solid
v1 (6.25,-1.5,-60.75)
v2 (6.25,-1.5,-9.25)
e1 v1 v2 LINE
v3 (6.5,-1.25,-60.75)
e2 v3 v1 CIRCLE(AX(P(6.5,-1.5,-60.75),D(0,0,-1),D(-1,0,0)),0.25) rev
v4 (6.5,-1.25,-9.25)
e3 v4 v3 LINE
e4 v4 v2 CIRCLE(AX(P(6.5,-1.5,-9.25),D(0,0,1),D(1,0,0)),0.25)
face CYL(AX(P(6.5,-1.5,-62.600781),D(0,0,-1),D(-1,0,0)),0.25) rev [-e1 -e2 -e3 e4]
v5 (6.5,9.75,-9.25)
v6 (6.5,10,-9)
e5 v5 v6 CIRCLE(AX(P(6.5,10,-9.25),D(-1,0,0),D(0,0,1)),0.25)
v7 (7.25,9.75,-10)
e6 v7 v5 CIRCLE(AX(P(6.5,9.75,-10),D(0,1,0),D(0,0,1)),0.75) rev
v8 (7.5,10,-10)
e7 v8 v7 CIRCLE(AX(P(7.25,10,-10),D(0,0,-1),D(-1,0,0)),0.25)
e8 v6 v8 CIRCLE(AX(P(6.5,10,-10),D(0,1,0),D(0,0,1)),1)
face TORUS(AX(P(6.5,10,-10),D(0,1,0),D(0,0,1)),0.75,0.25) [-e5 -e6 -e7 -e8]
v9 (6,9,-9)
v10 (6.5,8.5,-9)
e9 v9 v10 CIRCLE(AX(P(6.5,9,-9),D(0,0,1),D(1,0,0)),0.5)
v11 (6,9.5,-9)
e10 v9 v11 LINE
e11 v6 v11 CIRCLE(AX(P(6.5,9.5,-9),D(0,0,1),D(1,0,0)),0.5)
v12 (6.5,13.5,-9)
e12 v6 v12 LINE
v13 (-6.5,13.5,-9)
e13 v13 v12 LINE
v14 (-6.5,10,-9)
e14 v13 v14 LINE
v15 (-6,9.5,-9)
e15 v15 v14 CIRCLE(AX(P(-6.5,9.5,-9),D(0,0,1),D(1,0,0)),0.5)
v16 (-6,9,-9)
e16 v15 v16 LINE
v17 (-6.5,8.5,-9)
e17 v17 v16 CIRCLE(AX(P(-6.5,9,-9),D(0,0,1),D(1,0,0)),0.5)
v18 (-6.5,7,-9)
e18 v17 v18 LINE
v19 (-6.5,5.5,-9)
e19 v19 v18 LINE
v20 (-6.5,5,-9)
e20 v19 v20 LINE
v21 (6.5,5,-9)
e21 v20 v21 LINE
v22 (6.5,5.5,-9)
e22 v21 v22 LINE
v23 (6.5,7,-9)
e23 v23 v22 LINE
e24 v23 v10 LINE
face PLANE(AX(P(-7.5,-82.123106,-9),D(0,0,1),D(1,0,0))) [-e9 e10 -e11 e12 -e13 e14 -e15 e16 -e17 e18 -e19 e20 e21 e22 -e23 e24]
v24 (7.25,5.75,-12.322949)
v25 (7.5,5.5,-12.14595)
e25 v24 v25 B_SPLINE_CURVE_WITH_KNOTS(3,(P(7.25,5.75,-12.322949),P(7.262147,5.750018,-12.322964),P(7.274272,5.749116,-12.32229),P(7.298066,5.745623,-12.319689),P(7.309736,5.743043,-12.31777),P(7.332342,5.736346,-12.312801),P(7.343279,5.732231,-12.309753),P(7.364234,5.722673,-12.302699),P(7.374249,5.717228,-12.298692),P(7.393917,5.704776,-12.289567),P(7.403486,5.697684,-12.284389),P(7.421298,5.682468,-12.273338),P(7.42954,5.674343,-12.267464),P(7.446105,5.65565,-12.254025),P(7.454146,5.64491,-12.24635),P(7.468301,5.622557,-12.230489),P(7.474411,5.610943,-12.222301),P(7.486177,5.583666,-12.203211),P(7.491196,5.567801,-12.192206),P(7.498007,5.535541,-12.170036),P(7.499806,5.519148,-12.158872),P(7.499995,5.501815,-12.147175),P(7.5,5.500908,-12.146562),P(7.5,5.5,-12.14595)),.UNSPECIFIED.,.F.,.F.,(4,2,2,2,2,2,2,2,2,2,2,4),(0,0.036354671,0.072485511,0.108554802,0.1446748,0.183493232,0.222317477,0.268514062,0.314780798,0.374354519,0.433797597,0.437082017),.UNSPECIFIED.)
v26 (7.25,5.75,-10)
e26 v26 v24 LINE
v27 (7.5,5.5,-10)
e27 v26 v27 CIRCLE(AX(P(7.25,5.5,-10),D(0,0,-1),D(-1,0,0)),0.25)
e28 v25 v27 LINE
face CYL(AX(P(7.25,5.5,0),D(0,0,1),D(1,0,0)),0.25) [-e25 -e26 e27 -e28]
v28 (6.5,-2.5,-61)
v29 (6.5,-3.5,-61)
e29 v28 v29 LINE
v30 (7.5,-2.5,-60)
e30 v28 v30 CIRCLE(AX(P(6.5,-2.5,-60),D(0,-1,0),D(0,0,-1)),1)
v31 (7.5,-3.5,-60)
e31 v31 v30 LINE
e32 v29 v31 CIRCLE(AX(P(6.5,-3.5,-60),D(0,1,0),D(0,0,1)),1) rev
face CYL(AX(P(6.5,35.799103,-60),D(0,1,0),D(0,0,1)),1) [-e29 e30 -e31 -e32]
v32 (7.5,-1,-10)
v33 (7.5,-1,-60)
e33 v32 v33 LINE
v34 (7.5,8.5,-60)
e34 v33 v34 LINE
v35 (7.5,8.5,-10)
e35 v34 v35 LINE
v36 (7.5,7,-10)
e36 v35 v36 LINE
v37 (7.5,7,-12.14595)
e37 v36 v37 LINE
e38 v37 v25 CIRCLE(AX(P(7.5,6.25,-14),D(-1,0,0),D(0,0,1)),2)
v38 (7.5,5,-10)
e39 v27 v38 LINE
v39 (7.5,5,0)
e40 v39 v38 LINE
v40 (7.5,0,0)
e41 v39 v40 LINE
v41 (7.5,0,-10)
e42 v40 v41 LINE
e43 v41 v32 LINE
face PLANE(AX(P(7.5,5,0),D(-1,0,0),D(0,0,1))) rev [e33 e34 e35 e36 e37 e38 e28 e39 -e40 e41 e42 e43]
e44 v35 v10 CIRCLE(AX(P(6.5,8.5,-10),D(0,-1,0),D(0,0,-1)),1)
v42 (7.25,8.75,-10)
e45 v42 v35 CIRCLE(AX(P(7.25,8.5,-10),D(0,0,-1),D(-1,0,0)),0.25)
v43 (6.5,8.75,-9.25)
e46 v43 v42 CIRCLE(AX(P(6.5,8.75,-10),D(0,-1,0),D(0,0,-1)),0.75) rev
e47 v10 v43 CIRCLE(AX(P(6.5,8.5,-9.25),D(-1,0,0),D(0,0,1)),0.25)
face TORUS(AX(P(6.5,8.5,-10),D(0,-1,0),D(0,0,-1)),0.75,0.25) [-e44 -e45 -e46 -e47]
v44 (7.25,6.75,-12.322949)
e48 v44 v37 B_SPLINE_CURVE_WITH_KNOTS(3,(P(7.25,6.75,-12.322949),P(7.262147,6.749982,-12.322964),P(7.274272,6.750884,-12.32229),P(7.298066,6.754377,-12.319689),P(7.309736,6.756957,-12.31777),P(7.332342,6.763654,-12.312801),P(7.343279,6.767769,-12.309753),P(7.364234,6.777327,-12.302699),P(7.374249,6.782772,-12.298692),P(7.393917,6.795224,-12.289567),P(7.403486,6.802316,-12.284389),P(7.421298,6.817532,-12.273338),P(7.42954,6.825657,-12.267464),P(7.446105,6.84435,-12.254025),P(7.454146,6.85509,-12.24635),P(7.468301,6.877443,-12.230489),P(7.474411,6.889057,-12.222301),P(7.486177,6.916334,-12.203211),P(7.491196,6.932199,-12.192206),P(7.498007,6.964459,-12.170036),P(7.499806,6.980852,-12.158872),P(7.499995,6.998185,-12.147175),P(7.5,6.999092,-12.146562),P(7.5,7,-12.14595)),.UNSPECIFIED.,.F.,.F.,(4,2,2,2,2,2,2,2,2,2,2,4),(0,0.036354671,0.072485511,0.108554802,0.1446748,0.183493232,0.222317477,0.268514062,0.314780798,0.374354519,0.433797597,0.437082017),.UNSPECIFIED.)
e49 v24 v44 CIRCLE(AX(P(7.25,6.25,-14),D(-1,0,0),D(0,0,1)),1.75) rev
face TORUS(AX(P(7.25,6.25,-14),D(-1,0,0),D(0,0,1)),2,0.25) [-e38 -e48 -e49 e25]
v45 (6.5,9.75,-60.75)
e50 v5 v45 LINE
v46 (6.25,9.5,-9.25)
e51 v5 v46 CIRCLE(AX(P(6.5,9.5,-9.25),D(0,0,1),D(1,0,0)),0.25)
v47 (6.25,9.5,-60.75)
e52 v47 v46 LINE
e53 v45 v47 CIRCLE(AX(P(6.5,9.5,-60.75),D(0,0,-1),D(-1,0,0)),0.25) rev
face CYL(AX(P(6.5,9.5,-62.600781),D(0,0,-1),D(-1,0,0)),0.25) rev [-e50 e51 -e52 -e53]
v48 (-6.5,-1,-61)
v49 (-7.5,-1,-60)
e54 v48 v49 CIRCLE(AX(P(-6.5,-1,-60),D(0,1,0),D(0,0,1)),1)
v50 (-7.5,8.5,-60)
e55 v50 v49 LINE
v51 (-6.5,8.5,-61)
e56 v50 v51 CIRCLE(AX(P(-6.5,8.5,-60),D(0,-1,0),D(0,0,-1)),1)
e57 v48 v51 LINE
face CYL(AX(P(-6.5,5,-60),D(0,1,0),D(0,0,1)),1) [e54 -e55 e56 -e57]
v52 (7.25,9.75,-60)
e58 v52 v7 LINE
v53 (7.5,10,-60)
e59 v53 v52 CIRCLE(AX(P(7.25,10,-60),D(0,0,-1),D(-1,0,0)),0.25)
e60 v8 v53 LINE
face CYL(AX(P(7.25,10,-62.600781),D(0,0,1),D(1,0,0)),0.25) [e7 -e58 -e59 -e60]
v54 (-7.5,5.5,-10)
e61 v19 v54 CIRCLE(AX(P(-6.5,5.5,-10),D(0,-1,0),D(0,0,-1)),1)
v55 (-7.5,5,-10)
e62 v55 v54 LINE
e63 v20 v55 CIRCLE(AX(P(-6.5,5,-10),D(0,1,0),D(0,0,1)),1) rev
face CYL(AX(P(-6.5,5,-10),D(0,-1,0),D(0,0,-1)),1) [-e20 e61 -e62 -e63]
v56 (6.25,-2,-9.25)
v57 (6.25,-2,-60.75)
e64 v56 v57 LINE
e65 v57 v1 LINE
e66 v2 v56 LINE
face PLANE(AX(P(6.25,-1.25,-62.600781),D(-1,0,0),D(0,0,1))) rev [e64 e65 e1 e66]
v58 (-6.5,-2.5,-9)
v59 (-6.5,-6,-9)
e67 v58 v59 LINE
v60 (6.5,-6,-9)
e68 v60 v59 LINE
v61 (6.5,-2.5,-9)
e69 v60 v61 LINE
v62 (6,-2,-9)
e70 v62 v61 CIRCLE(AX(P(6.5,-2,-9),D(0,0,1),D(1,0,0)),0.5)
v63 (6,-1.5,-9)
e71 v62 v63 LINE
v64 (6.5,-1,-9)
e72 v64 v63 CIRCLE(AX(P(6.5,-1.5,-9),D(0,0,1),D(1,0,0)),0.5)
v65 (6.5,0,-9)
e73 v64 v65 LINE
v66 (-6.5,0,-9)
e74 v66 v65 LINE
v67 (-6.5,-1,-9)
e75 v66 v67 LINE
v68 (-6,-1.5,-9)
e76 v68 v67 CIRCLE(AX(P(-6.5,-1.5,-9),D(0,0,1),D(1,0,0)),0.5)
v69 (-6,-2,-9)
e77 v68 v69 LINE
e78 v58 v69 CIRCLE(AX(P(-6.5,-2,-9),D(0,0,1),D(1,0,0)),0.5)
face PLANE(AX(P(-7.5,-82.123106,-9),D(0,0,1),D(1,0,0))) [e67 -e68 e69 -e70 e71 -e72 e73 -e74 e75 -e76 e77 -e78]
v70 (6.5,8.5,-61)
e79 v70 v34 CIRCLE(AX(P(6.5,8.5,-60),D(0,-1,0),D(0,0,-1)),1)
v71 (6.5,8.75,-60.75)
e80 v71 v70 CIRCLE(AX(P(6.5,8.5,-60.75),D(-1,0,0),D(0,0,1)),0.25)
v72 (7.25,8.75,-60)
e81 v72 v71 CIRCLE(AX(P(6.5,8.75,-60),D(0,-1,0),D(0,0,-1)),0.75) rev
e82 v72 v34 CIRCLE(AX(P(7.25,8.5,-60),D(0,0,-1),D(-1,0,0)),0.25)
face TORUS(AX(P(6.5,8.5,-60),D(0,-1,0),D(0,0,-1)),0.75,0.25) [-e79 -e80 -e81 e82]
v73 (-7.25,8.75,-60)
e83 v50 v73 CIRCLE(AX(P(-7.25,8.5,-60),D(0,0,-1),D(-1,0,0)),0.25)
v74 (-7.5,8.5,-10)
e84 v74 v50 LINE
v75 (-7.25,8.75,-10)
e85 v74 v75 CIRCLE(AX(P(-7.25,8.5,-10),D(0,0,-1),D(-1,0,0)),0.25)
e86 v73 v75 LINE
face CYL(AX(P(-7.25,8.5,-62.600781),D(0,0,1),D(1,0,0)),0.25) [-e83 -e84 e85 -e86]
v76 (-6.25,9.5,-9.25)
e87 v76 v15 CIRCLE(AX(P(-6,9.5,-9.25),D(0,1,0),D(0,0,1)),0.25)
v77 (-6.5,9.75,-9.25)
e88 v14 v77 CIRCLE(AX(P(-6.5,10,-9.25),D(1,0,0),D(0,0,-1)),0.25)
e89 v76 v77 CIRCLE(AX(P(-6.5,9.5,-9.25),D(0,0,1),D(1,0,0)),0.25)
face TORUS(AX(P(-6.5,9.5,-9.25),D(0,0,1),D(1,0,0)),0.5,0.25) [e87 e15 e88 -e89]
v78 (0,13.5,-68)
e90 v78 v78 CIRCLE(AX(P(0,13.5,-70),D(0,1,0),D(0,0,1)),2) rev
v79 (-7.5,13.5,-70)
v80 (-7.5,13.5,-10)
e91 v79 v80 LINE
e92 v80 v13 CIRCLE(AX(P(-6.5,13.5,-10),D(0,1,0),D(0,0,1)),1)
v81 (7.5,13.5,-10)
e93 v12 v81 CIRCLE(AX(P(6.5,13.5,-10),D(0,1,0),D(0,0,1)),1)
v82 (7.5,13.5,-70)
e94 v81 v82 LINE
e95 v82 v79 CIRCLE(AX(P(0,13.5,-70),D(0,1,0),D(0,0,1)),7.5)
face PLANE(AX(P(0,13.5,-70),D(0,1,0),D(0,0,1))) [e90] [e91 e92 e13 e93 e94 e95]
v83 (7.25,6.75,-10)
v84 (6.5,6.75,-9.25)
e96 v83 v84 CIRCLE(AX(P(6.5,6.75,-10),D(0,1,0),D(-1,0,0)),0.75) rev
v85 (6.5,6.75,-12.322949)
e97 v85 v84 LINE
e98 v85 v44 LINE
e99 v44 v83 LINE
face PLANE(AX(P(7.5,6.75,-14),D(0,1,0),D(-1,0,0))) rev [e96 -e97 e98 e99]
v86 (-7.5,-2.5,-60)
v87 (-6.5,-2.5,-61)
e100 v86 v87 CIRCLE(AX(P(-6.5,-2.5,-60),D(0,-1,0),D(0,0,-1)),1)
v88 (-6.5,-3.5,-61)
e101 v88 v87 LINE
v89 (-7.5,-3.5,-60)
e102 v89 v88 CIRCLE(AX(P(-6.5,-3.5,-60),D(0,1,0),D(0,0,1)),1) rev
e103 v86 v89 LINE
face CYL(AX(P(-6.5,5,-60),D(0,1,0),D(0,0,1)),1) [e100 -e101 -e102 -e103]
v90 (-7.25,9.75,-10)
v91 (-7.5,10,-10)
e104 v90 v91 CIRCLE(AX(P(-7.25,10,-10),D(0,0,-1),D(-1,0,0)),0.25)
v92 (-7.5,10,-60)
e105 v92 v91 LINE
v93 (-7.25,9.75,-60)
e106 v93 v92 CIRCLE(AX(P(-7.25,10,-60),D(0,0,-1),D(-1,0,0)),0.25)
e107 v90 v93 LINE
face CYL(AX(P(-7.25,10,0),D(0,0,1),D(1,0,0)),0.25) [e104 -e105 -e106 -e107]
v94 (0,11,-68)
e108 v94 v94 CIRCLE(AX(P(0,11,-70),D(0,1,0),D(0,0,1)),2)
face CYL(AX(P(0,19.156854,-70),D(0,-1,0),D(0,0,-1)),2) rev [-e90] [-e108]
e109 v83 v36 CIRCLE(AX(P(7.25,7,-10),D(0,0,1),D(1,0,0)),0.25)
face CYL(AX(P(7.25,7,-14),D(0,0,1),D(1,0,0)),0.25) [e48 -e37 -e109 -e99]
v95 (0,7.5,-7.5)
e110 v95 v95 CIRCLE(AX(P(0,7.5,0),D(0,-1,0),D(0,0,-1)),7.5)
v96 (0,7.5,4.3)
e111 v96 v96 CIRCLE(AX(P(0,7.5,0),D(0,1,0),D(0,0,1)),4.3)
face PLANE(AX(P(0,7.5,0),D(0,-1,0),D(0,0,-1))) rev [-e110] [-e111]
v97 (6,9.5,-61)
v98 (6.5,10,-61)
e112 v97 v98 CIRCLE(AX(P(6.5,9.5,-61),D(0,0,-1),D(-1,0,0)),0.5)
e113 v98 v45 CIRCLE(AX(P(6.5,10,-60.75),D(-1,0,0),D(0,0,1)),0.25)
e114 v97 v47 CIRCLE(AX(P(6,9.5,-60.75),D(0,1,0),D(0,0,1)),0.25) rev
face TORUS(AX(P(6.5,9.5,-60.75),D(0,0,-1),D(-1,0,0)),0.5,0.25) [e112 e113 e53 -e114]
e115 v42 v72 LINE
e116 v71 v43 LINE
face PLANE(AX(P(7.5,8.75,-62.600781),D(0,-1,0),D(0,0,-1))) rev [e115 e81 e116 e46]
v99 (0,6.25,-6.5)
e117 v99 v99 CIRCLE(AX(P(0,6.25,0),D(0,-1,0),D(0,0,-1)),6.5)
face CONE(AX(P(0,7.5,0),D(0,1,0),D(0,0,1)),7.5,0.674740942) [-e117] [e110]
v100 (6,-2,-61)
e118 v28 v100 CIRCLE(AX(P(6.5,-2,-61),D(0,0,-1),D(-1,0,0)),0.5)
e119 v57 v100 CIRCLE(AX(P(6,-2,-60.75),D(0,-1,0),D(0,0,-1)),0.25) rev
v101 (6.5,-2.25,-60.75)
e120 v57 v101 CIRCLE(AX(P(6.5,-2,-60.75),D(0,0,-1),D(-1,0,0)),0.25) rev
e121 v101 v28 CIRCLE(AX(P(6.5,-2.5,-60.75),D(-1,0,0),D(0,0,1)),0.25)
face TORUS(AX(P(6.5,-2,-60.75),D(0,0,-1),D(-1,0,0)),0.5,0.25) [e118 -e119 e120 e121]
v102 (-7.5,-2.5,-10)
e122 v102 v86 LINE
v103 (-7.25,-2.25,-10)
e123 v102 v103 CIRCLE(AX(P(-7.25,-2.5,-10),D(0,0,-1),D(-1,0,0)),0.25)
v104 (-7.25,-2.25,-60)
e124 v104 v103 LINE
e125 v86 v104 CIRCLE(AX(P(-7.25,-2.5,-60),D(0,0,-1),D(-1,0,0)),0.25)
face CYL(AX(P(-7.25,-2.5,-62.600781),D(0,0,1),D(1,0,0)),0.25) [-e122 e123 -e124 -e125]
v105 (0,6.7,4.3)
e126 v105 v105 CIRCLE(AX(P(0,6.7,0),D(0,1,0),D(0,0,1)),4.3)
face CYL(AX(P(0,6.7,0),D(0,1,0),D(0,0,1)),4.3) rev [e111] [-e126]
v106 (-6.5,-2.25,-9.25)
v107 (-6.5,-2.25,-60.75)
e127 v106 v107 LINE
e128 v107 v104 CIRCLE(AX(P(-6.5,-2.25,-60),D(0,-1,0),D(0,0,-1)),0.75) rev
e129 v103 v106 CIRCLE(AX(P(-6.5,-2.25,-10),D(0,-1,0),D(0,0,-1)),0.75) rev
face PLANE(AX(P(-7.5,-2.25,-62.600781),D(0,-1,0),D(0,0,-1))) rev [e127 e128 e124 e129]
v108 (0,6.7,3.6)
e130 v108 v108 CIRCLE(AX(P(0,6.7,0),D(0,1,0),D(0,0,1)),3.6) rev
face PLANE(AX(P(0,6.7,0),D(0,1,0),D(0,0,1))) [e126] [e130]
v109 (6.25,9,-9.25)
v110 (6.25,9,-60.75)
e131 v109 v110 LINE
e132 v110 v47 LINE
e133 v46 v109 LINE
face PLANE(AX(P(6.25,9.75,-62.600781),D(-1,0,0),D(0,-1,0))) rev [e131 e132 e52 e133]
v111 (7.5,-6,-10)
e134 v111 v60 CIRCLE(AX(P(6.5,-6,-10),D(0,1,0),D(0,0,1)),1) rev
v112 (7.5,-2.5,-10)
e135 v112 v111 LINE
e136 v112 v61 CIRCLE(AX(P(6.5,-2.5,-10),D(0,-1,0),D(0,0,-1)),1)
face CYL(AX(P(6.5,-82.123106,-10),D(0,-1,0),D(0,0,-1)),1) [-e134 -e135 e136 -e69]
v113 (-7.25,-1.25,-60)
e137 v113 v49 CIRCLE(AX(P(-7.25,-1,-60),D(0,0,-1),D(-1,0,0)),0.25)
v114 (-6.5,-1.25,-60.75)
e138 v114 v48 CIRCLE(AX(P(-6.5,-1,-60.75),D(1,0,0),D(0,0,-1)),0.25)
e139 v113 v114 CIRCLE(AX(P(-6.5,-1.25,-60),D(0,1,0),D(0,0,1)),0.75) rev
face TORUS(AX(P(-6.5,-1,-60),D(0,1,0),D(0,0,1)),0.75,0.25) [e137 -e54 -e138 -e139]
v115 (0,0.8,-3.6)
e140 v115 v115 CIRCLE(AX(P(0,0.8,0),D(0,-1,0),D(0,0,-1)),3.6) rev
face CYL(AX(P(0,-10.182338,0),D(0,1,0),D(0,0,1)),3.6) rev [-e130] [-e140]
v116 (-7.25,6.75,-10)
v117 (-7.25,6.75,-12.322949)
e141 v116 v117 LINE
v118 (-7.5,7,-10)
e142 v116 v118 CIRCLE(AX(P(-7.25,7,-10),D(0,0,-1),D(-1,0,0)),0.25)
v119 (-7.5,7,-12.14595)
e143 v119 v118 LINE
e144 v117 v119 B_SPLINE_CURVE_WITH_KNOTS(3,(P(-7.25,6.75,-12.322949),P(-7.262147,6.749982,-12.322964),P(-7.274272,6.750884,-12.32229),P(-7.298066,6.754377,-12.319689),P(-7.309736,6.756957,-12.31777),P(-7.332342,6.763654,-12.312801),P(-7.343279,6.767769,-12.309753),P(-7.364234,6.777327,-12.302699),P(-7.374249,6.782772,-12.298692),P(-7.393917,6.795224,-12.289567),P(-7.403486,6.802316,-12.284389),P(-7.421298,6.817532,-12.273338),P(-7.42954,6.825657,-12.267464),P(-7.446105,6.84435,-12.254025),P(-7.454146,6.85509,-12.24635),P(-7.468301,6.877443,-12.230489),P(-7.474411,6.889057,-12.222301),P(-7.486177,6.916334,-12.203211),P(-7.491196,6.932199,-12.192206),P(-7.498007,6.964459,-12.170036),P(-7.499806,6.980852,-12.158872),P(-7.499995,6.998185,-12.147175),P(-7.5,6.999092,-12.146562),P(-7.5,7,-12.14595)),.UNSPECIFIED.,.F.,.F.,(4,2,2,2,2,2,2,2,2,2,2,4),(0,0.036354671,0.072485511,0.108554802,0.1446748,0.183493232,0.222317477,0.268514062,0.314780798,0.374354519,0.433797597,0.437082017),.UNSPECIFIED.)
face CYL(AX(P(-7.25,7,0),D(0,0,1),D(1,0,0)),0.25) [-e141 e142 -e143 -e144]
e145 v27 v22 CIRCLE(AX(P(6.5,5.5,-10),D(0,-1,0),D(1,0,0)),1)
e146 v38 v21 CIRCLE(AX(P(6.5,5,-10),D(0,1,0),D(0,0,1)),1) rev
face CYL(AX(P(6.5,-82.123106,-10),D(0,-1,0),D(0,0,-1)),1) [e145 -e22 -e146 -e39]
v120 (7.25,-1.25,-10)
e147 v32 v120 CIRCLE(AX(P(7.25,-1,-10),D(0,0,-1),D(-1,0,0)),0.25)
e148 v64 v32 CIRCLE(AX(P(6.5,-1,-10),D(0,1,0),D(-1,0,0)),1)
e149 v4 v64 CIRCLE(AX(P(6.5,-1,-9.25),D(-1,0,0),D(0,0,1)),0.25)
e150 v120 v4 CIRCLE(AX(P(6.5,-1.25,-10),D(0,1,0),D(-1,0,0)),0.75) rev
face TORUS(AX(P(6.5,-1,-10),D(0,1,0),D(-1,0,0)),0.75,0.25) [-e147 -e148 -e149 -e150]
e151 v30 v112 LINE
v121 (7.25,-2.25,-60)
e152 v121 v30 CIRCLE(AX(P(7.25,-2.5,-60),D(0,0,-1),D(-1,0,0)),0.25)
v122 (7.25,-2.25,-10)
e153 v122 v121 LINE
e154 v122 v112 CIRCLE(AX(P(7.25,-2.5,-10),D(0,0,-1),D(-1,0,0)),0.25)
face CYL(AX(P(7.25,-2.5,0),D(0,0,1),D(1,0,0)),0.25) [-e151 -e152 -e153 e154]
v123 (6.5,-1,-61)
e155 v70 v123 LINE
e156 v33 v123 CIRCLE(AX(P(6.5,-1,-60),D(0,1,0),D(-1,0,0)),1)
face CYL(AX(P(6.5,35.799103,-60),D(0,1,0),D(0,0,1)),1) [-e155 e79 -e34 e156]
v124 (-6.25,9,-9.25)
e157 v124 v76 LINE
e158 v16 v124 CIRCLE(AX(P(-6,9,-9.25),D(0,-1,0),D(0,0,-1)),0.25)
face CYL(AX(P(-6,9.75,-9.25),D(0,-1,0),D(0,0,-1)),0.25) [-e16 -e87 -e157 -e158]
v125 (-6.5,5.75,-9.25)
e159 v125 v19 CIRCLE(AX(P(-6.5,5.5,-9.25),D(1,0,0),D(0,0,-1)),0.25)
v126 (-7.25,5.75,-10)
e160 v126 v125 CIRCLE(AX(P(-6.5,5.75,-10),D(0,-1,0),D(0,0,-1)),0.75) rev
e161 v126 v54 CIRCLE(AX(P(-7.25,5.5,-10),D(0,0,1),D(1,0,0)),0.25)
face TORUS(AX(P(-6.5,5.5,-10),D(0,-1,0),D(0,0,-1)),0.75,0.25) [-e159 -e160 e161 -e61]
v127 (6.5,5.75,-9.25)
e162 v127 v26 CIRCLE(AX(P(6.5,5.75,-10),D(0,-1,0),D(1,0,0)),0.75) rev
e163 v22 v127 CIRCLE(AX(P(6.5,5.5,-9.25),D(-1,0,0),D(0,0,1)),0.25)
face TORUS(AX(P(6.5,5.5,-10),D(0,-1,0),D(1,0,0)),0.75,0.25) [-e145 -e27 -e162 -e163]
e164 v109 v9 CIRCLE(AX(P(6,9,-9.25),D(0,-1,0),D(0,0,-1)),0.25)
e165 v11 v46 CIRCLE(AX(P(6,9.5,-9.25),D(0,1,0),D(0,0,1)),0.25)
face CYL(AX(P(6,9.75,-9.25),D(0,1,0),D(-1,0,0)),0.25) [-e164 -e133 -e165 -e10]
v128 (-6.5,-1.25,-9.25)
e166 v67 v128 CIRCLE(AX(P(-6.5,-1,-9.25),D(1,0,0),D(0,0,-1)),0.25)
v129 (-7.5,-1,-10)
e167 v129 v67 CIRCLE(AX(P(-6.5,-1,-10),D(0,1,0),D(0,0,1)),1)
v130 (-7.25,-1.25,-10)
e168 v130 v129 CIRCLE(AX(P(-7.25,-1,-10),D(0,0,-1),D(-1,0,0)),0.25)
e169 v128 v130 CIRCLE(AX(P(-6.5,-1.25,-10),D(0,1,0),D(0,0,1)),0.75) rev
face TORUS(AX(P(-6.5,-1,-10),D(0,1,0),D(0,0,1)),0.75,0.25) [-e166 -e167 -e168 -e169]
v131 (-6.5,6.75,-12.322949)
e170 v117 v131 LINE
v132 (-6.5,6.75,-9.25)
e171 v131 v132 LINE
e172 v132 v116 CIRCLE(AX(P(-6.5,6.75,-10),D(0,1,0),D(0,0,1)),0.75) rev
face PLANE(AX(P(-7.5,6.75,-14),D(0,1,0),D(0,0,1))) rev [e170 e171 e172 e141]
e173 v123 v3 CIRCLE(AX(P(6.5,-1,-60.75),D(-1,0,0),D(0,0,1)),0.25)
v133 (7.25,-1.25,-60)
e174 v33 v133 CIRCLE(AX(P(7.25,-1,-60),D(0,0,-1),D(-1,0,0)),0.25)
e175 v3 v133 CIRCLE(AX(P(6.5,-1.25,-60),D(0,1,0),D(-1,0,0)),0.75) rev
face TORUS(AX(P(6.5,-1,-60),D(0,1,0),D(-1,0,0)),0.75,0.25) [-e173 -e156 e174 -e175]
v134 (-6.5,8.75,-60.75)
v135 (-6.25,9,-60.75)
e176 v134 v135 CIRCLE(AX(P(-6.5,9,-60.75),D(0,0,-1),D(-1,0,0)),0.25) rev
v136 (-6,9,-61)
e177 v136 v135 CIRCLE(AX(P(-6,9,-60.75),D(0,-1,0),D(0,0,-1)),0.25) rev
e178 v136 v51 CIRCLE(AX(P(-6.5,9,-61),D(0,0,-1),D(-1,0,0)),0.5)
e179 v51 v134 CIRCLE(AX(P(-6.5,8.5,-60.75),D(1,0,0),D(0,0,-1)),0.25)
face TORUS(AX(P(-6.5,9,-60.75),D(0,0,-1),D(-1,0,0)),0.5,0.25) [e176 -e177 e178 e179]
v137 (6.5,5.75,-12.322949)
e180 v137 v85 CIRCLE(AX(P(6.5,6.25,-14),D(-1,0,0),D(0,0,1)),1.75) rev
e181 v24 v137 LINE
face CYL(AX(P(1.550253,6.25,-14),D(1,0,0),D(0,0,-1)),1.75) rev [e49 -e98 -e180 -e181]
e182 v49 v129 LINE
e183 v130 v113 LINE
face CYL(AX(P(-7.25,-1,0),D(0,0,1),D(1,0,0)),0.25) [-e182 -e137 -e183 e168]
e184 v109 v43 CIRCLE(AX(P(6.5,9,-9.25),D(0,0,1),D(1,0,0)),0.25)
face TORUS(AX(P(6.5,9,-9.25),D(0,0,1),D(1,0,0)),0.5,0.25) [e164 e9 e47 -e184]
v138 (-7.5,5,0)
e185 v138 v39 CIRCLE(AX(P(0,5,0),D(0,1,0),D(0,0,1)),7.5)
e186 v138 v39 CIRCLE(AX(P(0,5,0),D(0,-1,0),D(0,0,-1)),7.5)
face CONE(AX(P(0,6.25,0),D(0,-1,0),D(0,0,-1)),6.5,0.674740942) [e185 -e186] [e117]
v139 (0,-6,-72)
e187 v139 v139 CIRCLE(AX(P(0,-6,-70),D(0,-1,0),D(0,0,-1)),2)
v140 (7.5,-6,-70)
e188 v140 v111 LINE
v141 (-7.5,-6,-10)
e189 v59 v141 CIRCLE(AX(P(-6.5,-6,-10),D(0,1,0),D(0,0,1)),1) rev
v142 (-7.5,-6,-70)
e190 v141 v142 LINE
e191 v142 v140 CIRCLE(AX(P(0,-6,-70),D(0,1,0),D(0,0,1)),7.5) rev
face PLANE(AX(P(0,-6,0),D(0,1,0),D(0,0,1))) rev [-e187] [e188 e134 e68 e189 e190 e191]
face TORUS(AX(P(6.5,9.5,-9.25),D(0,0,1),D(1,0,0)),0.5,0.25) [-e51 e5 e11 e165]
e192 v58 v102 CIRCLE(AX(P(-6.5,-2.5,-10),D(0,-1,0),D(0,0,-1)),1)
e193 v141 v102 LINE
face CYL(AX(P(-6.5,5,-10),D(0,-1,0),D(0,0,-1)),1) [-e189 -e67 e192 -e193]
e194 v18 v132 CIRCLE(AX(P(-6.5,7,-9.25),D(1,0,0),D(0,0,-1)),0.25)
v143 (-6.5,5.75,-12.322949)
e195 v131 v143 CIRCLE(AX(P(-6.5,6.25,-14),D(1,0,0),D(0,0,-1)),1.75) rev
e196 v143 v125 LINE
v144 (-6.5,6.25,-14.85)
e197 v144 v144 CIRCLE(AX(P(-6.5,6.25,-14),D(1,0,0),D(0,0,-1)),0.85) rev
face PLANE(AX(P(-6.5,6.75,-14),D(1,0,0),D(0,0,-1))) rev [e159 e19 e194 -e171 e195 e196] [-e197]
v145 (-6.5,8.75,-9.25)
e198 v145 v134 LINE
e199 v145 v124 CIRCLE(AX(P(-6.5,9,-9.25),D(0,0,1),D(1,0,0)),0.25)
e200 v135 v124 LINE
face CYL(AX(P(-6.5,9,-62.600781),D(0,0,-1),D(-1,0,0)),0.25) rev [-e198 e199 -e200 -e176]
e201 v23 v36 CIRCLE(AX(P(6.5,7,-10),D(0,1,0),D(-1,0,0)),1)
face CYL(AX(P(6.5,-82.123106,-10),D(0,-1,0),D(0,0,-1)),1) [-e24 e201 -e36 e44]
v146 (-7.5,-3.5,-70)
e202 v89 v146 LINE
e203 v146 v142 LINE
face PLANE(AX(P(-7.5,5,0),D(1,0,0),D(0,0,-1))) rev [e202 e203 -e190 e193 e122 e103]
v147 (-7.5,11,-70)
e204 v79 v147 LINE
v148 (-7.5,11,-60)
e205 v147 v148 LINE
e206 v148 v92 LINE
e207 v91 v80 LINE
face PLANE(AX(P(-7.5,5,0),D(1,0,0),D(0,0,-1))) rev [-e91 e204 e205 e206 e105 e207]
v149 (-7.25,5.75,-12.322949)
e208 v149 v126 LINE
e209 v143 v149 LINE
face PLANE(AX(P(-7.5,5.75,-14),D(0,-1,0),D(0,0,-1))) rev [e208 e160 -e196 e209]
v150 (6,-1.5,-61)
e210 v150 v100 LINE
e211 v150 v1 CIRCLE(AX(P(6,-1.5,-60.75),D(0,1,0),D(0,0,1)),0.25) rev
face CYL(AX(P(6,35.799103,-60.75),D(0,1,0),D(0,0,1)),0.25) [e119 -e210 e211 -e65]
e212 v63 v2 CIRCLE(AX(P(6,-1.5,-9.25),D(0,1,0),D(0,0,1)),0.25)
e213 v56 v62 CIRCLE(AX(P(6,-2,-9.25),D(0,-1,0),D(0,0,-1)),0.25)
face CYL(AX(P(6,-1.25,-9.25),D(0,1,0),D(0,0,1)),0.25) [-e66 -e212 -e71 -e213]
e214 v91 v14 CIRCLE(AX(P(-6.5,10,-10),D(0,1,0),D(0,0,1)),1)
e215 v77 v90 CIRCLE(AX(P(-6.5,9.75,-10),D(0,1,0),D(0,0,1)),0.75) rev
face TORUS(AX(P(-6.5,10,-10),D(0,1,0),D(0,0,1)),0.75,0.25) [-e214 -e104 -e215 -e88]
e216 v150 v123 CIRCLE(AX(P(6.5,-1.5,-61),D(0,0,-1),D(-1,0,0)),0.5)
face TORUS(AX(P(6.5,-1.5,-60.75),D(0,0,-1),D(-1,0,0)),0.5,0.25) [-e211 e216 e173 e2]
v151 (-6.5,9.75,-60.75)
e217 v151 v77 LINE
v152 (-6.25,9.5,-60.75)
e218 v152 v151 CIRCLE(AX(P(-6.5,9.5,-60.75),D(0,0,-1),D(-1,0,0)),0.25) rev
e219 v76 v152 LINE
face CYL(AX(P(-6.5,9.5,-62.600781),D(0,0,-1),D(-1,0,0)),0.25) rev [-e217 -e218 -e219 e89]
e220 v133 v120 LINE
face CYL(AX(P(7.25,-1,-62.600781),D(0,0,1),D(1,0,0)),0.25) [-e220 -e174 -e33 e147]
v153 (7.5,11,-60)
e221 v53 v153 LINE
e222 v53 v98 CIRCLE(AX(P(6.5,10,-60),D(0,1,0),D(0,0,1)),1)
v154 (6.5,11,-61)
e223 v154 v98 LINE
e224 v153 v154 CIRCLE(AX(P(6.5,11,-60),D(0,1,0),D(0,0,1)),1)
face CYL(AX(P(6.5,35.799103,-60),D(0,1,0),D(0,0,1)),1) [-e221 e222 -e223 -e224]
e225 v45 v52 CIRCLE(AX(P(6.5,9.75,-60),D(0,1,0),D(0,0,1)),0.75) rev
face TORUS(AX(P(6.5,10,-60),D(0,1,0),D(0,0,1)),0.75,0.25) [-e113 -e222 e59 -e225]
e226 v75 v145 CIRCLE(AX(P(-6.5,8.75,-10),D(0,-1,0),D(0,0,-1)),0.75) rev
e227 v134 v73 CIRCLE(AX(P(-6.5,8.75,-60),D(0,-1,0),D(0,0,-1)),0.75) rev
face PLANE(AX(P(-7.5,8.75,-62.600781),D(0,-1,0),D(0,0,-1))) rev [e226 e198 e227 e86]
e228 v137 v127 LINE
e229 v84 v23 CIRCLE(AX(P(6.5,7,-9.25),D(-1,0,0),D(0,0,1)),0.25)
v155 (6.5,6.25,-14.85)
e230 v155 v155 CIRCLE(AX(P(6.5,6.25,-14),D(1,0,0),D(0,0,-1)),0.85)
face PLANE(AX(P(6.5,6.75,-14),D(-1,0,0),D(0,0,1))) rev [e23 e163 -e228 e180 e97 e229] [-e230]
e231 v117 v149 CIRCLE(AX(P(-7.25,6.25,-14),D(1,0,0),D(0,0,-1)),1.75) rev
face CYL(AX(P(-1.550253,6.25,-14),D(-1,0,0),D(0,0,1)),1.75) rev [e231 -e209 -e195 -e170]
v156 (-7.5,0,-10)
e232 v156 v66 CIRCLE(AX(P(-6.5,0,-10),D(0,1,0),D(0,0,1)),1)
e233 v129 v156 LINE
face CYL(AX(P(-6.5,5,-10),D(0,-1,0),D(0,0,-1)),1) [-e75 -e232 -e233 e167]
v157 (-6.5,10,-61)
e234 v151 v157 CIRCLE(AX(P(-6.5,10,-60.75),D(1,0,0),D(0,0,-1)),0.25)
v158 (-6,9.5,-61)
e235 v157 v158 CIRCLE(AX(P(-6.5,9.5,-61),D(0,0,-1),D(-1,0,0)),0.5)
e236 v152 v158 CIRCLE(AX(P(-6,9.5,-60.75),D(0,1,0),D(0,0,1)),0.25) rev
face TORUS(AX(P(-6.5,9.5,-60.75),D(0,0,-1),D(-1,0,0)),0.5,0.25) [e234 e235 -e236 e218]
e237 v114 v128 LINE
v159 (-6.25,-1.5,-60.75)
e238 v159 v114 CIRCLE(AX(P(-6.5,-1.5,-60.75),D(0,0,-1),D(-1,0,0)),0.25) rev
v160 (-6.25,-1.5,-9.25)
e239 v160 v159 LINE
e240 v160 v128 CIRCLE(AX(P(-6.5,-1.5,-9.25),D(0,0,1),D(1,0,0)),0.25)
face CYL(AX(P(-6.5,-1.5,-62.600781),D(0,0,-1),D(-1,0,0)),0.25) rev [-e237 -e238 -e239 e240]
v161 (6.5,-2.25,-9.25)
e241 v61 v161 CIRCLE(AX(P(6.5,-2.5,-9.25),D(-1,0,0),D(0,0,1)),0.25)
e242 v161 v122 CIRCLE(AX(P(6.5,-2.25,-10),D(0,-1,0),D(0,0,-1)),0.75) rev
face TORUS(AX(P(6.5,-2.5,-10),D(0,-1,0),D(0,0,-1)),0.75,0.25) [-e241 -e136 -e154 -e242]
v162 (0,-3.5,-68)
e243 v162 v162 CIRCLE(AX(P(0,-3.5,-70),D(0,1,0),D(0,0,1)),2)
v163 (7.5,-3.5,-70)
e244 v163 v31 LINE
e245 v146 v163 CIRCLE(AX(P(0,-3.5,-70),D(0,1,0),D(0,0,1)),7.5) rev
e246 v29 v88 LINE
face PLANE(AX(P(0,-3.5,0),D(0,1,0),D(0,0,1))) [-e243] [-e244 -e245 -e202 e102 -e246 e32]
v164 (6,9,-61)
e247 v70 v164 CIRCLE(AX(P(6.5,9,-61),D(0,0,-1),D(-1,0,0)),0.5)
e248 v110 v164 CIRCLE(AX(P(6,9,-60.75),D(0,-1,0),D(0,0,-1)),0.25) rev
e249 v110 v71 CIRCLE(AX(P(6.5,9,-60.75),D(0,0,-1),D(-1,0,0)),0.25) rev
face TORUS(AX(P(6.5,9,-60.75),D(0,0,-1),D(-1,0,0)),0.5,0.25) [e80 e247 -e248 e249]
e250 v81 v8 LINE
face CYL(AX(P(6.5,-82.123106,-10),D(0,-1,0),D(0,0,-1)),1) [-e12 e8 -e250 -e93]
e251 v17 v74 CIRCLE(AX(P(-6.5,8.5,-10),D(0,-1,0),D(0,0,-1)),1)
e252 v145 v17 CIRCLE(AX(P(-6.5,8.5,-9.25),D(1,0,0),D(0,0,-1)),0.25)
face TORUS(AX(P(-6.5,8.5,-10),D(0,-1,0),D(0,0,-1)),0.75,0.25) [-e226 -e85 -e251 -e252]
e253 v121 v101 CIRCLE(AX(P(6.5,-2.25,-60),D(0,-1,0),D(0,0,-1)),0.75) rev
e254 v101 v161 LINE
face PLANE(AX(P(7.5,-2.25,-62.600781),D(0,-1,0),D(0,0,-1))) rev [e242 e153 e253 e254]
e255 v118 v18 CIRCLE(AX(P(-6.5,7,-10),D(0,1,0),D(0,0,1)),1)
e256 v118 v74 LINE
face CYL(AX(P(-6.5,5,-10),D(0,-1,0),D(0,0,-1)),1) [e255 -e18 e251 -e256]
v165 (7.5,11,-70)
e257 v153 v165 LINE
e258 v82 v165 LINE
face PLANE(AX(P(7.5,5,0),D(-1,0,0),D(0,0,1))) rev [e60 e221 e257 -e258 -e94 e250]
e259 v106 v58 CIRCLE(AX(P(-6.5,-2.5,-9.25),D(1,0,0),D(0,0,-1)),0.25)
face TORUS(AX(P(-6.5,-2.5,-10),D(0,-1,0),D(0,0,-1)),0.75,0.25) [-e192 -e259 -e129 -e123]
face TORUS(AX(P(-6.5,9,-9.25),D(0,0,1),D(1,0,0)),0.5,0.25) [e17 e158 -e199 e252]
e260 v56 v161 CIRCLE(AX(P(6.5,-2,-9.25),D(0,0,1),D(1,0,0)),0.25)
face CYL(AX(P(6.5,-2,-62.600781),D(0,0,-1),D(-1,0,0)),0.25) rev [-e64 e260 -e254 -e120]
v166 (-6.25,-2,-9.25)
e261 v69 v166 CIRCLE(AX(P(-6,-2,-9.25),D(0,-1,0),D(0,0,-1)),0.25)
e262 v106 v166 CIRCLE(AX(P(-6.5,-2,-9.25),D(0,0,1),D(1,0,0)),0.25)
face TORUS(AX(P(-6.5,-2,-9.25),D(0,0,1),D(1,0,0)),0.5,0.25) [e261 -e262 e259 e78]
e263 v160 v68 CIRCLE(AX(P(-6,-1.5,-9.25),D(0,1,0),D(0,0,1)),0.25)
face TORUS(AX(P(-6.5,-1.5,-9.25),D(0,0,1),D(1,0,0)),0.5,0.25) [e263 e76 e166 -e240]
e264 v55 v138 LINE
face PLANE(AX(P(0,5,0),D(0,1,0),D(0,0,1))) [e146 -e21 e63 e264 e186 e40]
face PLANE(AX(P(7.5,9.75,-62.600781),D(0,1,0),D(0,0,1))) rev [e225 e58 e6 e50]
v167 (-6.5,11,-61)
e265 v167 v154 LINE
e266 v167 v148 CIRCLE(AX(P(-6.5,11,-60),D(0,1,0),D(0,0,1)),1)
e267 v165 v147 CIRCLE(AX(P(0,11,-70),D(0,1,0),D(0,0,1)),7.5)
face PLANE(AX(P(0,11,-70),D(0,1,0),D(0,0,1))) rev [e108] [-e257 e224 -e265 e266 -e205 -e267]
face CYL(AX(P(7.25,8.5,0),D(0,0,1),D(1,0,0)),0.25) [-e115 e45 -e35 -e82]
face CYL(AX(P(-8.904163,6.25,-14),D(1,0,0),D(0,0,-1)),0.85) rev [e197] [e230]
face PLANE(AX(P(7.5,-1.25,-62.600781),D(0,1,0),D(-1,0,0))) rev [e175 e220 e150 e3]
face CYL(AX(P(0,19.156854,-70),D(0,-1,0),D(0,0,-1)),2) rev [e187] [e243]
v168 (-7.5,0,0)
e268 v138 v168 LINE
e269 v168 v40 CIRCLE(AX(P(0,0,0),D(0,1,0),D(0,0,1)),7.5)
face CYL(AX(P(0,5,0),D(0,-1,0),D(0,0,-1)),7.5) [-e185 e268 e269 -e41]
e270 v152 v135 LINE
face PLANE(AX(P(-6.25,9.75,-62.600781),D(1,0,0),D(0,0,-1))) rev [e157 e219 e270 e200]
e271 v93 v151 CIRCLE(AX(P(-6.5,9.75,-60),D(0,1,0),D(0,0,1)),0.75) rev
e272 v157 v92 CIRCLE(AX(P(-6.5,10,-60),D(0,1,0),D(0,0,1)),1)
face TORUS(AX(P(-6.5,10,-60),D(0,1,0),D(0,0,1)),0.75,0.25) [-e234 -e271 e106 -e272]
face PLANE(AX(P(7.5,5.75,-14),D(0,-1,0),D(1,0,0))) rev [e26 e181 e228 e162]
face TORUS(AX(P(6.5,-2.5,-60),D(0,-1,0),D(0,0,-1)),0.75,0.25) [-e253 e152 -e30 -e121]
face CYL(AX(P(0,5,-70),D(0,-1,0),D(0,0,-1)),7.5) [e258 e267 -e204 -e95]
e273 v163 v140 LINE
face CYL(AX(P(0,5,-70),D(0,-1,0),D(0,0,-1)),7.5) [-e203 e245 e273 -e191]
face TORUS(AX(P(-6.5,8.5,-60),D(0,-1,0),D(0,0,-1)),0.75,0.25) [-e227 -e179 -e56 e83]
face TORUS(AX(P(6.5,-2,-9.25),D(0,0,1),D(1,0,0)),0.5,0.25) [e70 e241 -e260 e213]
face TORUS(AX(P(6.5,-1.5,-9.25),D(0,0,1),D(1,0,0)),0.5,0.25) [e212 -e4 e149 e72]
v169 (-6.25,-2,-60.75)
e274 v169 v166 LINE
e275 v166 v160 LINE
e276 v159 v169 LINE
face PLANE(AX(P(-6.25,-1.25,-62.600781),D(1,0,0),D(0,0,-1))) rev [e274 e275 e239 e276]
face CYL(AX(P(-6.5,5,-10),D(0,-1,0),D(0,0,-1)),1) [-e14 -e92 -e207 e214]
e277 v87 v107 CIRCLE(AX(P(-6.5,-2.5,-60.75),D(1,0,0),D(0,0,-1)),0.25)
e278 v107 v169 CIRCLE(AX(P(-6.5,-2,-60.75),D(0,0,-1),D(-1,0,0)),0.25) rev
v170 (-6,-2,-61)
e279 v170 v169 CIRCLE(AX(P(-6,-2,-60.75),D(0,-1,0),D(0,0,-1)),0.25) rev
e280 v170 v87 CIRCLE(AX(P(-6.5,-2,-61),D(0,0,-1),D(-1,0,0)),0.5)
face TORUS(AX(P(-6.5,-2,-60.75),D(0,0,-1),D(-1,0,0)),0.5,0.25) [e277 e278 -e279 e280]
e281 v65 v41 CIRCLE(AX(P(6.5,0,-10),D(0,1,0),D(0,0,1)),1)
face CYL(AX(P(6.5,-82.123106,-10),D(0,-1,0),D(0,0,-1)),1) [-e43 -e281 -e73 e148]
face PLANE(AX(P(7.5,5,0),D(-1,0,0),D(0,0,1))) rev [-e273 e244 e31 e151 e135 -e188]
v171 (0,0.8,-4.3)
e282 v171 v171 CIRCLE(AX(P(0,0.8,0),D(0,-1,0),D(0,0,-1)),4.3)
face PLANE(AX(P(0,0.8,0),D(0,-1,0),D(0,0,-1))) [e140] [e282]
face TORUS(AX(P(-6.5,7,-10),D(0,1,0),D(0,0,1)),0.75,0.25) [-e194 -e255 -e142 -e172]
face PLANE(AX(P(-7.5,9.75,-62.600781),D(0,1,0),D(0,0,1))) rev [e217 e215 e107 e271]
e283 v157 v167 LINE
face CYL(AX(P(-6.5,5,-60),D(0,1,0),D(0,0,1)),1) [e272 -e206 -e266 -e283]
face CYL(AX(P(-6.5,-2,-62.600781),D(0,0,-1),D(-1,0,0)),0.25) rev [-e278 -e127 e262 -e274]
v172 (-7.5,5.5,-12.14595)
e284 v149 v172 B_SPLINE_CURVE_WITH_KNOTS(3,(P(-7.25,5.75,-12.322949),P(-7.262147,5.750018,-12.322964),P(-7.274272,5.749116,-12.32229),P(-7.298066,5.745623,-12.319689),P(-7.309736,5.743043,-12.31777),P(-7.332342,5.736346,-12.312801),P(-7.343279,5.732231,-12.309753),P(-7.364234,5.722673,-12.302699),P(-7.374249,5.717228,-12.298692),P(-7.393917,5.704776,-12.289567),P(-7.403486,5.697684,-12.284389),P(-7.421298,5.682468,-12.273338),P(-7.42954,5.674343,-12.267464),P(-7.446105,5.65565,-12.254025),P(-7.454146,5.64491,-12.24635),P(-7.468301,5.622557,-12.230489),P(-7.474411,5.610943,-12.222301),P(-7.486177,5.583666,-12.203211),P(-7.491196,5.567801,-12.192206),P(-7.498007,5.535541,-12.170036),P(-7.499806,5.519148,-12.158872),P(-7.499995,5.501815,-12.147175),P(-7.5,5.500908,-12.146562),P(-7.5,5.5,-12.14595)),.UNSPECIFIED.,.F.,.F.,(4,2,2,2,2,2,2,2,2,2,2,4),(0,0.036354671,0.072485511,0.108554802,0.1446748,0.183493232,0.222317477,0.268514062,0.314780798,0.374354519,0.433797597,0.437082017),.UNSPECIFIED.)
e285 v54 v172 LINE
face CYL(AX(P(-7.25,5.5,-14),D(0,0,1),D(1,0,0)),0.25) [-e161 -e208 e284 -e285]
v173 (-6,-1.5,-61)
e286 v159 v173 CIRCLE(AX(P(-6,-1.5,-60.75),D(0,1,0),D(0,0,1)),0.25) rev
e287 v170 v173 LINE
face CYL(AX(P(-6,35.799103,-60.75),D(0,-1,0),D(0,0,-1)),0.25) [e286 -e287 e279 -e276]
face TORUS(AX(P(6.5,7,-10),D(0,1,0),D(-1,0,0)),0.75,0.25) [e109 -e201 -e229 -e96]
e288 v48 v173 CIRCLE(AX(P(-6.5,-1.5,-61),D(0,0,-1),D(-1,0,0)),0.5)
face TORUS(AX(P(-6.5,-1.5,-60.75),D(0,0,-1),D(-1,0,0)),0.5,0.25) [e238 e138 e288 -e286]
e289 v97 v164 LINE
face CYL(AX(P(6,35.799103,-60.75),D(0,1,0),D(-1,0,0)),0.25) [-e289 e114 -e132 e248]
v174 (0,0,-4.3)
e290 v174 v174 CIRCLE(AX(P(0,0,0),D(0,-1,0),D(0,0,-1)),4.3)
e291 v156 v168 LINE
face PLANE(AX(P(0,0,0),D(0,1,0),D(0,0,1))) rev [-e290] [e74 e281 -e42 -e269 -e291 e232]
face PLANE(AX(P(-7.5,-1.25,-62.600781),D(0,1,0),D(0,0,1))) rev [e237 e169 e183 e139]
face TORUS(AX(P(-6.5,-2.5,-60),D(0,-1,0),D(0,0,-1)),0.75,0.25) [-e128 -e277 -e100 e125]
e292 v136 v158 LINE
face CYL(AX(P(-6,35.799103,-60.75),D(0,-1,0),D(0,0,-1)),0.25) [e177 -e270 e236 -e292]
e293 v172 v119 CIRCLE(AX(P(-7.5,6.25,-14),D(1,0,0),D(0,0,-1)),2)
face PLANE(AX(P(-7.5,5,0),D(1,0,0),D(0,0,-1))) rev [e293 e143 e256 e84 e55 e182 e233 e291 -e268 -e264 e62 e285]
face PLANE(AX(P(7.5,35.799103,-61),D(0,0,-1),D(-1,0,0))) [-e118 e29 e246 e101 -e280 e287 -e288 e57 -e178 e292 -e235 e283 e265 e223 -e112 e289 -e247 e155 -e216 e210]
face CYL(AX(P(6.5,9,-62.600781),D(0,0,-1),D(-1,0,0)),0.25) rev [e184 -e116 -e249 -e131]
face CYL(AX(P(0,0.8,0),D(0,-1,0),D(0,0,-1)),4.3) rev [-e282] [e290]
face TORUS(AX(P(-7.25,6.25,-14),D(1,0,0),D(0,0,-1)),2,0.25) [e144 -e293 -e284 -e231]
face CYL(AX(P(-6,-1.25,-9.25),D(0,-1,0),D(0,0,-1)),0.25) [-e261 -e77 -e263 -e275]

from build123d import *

# Parameters (mm, degrees)
EXTRUDE_1_DEPTH          = 5
EXTRUDE_3_DEPTH          = 8.5
EXTRUDE_3_DEPTH_BACK     = 11
CUT_EXTRUDE_1_DEPTH      = 11
CUT_EXTRUDE_1_DEPTH_BACK = 3.5
FILLET_1_R               = 1
SKETCH_5_W               = 1
SKETCH_5_H               = 1
CUT_EXTRUDE_2_DEPTH      = 5
CUT_EXTRUDE_3_REACH      = 82.084
SKETCH_6_R               = 0.5
SKETCH_7_R               = 1.75
CUT_EXTRUDE_4_DEPTH      = 1
CUT_EXTRUDE_START        = -1
SKETCH_8_R               = 1.75
CUT_EXTRUDE_5_DEPTH      = 1
CUT_EXTRUDE_6_REACH      = 72.219
SKETCH_9_W               = 1.25
SKETCH_9_H               = 1
FILLET_2_R               = 0.25
SKETCH_10_R              = 3.6
CUT_EXTRUDE_7_DEPTH      = 7.5
CUT_EXTRUDE_8_REACH      = 82.267
SKETCH_11_R              = 2
SKETCH_12_R              = 4.3
CUT_EXTRUDE_9_DEPTH      = 0.8
CUT_EXTRUDE_START_2      = -0.8
SKETCH_13_R              = 4.3
CUT_EXTRUDE_10_DEPTH     = 0.8
SKETCH_14_R              = 0.85
CUT_EXTRUDE_11_DEPTH     = 13


with BuildPart() as part:
    # 스케치1 → 보스-돌출1 (new body)
    with BuildSketch(Plane(origin=(0, 0, 0), x_dir=(1, 0, 0), z_dir=(0, 1, 0))):
        with BuildLine():
            Line((-7.5, 0), (-7.5, 70))
            ThreePointArc((-7.5, 70), (0, 77.5), (7.5, 70))
            Line((7.5, 70), (7.5, 0))
            ThreePointArc((7.5, 0), (0, -7.5), (-7.5, 0))
        make_face()
    extrude(amount=EXTRUDE_1_DEPTH)

    # 스케치2 → 회전1 (revolve)
    with BuildSketch(Plane.XY, mode=Mode.PRIVATE) as revolve_1_sk:
        Polygon((-6.5, 6.25), (-7.5, 5), (0, 5), (0, 7.5), (-7.5, 7.5), align=None)
    revolve(revolve_1_sk.sketch.rotate(Axis((0, 0, 0), (0, 1, 0)), 270), axis=Axis((0, 0, 0), (0, 1, 0)))

    # 스케치3 → 보스-돌출3 (add, two sides: drawn at the far end of the back side and taken through both)
    with BuildSketch(Plane(origin=(0, 5, 0), x_dir=(1, 0, 0), z_dir=(0, 1, 0)).offset(-EXTRUDE_3_DEPTH_BACK)):
        with BuildLine():
            Line((7.5, 70), (7.5, 9))
            Line((7.5, 9), (-7.5, 9))
            Line((-7.5, 9), (-7.5, 70))
            ThreePointArc((-7.5, 70), (0, 77.5), (7.5, 70))
        make_face()
    extrude(amount=EXTRUDE_3_DEPTH + EXTRUDE_3_DEPTH_BACK)

    # 스케치4 → 컷-돌출1 (cut, two sides: drawn at the far end of the back side and taken through both)
    with BuildSketch(Plane(origin=(0, 0, 0), x_dir=(1, 0, 0), z_dir=(0, 1, 0)).offset(-CUT_EXTRUDE_1_DEPTH_BACK)):
        with BuildLine():
            Line((7.5, 70), (7.5, 61))
            Line((7.5, 61), (-7.5, 61))
            Line((-7.5, 61), (-7.5, 70))
            ThreePointArc((-7.5, 70), (0, 77.5), (7.5, 70))
        make_face()
    extrude(amount=CUT_EXTRUDE_1_DEPTH + CUT_EXTRUDE_1_DEPTH_BACK, mode=Mode.SUBTRACT)

    # 필렛1
    fillet_1_edges = [part.edges().sort_by_distance(p)[0] for p in [
        (7.5, -3, -9),
        (-7.5, -3, -9),
        (7.5, 9.25, -9),
        (-7.5, 9.25, -9),
        (-7.5, 3.75, -61),
        (7.5, 3.75, -61),
    ]]
    fillet(fillet_1_edges, radius=FILLET_1_R)

    # 스케치5 → 컷-돌출2 (cut)
    with BuildSketch(Plane.XY.offset(-9)):
        with Locations((7, 6.25)):
            Rectangle(SKETCH_5_W, SKETCH_5_H)
        with Locations((-7, 6.25)):
            Rectangle(SKETCH_5_W, SKETCH_5_H)
    extrude(amount=-CUT_EXTRUDE_2_DEPTH, mode=Mode.SUBTRACT)

    # 컷-돌출3: up to this face of the body (flat: up to its plane)
    cut_extrude_3_end = Plane(part.part.faces().sort_by_distance((-7.5, 3.682306256, -35.085901027))[0])
    # 스케치6 → 컷-돌출3 (cut, up to the picked face)
    with BuildSketch(Plane(origin=(7.5, 0, 0), x_dir=(0, 0, -1), z_dir=(1, 0, 0)), mode=Mode.PRIVATE) as cut_extrude_3_sk1:
        with Locations(Location((14, 6.25, 0), (0, 0, 90))):
            Circle(SKETCH_6_R)
    cut_extrude_3_tool1 = split(extrude(cut_extrude_3_sk1.sketch, amount=-CUT_EXTRUDE_3_REACH, mode=Mode.PRIVATE), bisect_by=cut_extrude_3_end, keep=Keep.BOTH, mode=Mode.PRIVATE)
    add(cut_extrude_3_tool1.solids().sort_by(Axis((7.5, 6.25, -14), (-1, 0, 0)))[0], mode=Mode.SUBTRACT)

    # 스케치7 → 컷-돌출4 (cut)
    with BuildSketch(Plane(origin=(7.5, 0, 0), x_dir=(0, 0, -1), z_dir=(1, 0, 0))):
        with Locations((14, 6.25)):
            Circle(SKETCH_7_R)
    extrude(amount=-CUT_EXTRUDE_4_DEPTH, mode=Mode.SUBTRACT)

    # 스케치8 → 컷-돌출5 (cut)
    with BuildSketch(Plane.ZY.offset(7.5).offset(CUT_EXTRUDE_START)):
        with Locations((-14, 6.25)):
            Circle(SKETCH_8_R)
    extrude(amount=CUT_EXTRUDE_5_DEPTH, mode=Mode.SUBTRACT)

    # 컷-돌출6: up to this face of the body (flat: up to its plane)
    cut_extrude_6_end = Plane(part.part.faces().sort_by_distance((0, 3.75, -61))[0])
    # 스케치9 → 컷-돌출6 (cut, up to the picked face)
    with BuildSketch(Plane.XY.offset(-9), mode=Mode.PRIVATE) as cut_extrude_6_sk1:
        with Locations((-6.875, 9.25)):
            Rectangle(SKETCH_9_W, SKETCH_9_H)
    cut_extrude_6_tool1 = split(extrude(cut_extrude_6_sk1.sketch, amount=-CUT_EXTRUDE_6_REACH, mode=Mode.PRIVATE), bisect_by=cut_extrude_6_end, keep=Keep.BOTH, mode=Mode.PRIVATE)
    # 스케치9 → 컷-돌출6 (cut, up to the picked face)
    with BuildSketch(Plane.XY.offset(-9), mode=Mode.PRIVATE) as cut_extrude_6_sk2:
        with Locations((6.875, 9.25)):
            Rectangle(SKETCH_9_W, SKETCH_9_H)
    cut_extrude_6_tool2 = split(extrude(cut_extrude_6_sk2.sketch, amount=-CUT_EXTRUDE_6_REACH, mode=Mode.PRIVATE), bisect_by=cut_extrude_6_end, keep=Keep.BOTH, mode=Mode.PRIVATE)
    # 스케치9 → 컷-돌출6 (cut, up to the picked face)
    with BuildSketch(Plane.XY.offset(-9), mode=Mode.PRIVATE) as cut_extrude_6_sk3:
        with Locations((6.875, -1.75)):
            Rectangle(SKETCH_9_W, SKETCH_9_H)
    cut_extrude_6_tool3 = split(extrude(cut_extrude_6_sk3.sketch, amount=-CUT_EXTRUDE_6_REACH, mode=Mode.PRIVATE), bisect_by=cut_extrude_6_end, keep=Keep.BOTH, mode=Mode.PRIVATE)
    # 스케치9 → 컷-돌출6 (cut, up to the picked face)
    with BuildSketch(Plane.XY.offset(-9), mode=Mode.PRIVATE) as cut_extrude_6_sk4:
        with Locations((-6.875, -1.75)):
            Rectangle(SKETCH_9_W, SKETCH_9_H)
    cut_extrude_6_tool4 = split(extrude(cut_extrude_6_sk4.sketch, amount=-CUT_EXTRUDE_6_REACH, mode=Mode.PRIVATE), bisect_by=cut_extrude_6_end, keep=Keep.BOTH, mode=Mode.PRIVATE)
    add(cut_extrude_6_tool1.solids().sort_by(Axis((-6.875, 9.25, -9), (0, 0, -1)))[0], mode=Mode.SUBTRACT)
    add(cut_extrude_6_tool2.solids().sort_by(Axis((6.875, 9.25, -9), (0, 0, -1)))[0], mode=Mode.SUBTRACT)
    add(cut_extrude_6_tool3.solids().sort_by(Axis((6.875, -1.75, -9), (0, 0, -1)))[0], mode=Mode.SUBTRACT)
    add(cut_extrude_6_tool4.solids().sort_by(Axis((-6.875, -1.75, -9), (0, 0, -1)))[0], mode=Mode.SUBTRACT)

    # 필렛2
    fillet_2_edges = [part.edges().sort_by_distance(p)[0] for p in [
        (7.207106781, 9.75, -60.707106781),
        (7.207106781, 9.75, -9.292893219),
        (7.207106781, 8.75, -60.707106781),
        (7.207106781, 8.75, -9.292893219),
        (7.207106781, 6.75, -9.292893219),
        (7.207106781, 5.75, -9.292893219),
        (7.207106781, -1.25, -60.707106781),
        (7.207106781, -1.25, -9.292893219),
        (7.207106781, -2.25, -60.707106781),
        (7.207106781, -2.25, -9.292893219),
        (-7.207106781, 5.75, -9.292893219),
        (-7.207106781, 6.75, -9.292893219),
        (-7.207106781, 8.75, -60.707106781),
        (-7.207106781, 8.75, -9.292893219),
        (-7.207106781, 9.75, -60.707106781),
        (-7.207106781, 9.75, -9.292893219),
        (-7.207106781, -2.25, -60.707106781),
        (-7.207106781, -2.25, -9.292893219),
        (-7.207106781, -1.25, -60.707106781),
        (-7.207106781, -1.25, -9.292893219),
        (7.5, 9.75, -35),
        (7.5, 8.75, -35),
        (7.5, 6.25, -15.75),
        (7.5, 6.75, -11.161474508),
        (7.5, 5.75, -11.161474508),
        (7.5, -1.25, -35),
        (7.5, -2.25, -35),
        (-7.5, 6.25, -15.75),
        (-7.5, 5.75, -11.161474508),
        (-7.5, 6.75, -11.161474508),
        (-7.5, 8.75, -35),
        (-7.5, 9.75, -35),
        (-7.5, -2.25, -35),
        (-7.5, -1.25, -35),
        (-6.25, 9.25, -61),
        (-6.25, 9.25, -9),
        (-6.25, -1.75, -61),
        (-6.25, -1.75, -9),
        (-6.25, 8.75, -35),
        (-6.25, -2.25, -35),
        (6.25, 9.25, -61),
        (6.25, 9.25, -9),
        (6.25, -1.75, -61),
        (6.25, -1.75, -9),
        (6.25, -1.25, -35),
        (6.25, 9.75, -35),
        (-6.25, 9.75, -35),
        (-6.25, -1.25, -35),
        (6.25, -2.25, -35),
        (6.25, 8.75, -35),
    ]]
    fillet(fillet_2_edges, radius=FILLET_2_R - 0.0001)  # a hair under: the kernel refuses the full size

    # 스케치10 → 컷-돌출7 (cut)
    with BuildSketch(Plane(origin=(0, 7.5, 0), x_dir=(1, 0, 0), z_dir=(0, 1, 0))):
        with Locations(Location((0, 0, 0), (0, 0, 270))):
            Circle(SKETCH_10_R)
    extrude(amount=-CUT_EXTRUDE_7_DEPTH, mode=Mode.SUBTRACT)

    # 컷-돌출8: up to this face of the body (flat: up to its plane)
    cut_extrude_8_end = Plane(part.part.faces().sort_by_distance((0, 13.5, -42.480415366))[0])
    # 스케치11 → 컷-돌출8 (cut, up to the picked face)
    with BuildSketch(Plane.XZ.offset(6), mode=Mode.PRIVATE) as cut_extrude_8_sk1:
        with Locations(Location((0, -70, 0), (0, 0, 270))):
            Circle(SKETCH_11_R)
    cut_extrude_8_tool1 = split(extrude(cut_extrude_8_sk1.sketch, amount=-CUT_EXTRUDE_8_REACH, mode=Mode.PRIVATE), bisect_by=cut_extrude_8_end, keep=Keep.BOTH, mode=Mode.PRIVATE)
    add(cut_extrude_8_tool1.solids().sort_by(Axis((0, -6, -70), (0, 1, 0)))[0], mode=Mode.SUBTRACT)

    # 스케치12 → 컷-돌출9 (cut)
    with BuildSketch(Plane.XZ):
        with Locations(Location((0, 0, 0), (0, 0, 270))):
            Circle(SKETCH_12_R)
    extrude(amount=-CUT_EXTRUDE_9_DEPTH, mode=Mode.SUBTRACT)

    # 스케치13 → 컷-돌출10 (cut)
    with BuildSketch(Plane(origin=(0, 7.5, 0), x_dir=(1, 0, 0), z_dir=(0, 1, 0)).offset(CUT_EXTRUDE_START_2)):
        with Locations(Location((0, 0, 0), (0, 0, 90))):
            Circle(SKETCH_13_R)
    extrude(amount=CUT_EXTRUDE_10_DEPTH, mode=Mode.SUBTRACT)

    # 스케치14 → 컷-돌출11 (cut)
    with BuildSketch(Plane(origin=(6.5, 0, 0), x_dir=(0, 0, -1), z_dir=(1, 0, 0))):
        with Locations((14, 6.25)):
            Circle(SKETCH_14_R)
    extrude(amount=-CUT_EXTRUDE_11_DEPTH, mode=Mode.SUBTRACT)


solid = part.part
